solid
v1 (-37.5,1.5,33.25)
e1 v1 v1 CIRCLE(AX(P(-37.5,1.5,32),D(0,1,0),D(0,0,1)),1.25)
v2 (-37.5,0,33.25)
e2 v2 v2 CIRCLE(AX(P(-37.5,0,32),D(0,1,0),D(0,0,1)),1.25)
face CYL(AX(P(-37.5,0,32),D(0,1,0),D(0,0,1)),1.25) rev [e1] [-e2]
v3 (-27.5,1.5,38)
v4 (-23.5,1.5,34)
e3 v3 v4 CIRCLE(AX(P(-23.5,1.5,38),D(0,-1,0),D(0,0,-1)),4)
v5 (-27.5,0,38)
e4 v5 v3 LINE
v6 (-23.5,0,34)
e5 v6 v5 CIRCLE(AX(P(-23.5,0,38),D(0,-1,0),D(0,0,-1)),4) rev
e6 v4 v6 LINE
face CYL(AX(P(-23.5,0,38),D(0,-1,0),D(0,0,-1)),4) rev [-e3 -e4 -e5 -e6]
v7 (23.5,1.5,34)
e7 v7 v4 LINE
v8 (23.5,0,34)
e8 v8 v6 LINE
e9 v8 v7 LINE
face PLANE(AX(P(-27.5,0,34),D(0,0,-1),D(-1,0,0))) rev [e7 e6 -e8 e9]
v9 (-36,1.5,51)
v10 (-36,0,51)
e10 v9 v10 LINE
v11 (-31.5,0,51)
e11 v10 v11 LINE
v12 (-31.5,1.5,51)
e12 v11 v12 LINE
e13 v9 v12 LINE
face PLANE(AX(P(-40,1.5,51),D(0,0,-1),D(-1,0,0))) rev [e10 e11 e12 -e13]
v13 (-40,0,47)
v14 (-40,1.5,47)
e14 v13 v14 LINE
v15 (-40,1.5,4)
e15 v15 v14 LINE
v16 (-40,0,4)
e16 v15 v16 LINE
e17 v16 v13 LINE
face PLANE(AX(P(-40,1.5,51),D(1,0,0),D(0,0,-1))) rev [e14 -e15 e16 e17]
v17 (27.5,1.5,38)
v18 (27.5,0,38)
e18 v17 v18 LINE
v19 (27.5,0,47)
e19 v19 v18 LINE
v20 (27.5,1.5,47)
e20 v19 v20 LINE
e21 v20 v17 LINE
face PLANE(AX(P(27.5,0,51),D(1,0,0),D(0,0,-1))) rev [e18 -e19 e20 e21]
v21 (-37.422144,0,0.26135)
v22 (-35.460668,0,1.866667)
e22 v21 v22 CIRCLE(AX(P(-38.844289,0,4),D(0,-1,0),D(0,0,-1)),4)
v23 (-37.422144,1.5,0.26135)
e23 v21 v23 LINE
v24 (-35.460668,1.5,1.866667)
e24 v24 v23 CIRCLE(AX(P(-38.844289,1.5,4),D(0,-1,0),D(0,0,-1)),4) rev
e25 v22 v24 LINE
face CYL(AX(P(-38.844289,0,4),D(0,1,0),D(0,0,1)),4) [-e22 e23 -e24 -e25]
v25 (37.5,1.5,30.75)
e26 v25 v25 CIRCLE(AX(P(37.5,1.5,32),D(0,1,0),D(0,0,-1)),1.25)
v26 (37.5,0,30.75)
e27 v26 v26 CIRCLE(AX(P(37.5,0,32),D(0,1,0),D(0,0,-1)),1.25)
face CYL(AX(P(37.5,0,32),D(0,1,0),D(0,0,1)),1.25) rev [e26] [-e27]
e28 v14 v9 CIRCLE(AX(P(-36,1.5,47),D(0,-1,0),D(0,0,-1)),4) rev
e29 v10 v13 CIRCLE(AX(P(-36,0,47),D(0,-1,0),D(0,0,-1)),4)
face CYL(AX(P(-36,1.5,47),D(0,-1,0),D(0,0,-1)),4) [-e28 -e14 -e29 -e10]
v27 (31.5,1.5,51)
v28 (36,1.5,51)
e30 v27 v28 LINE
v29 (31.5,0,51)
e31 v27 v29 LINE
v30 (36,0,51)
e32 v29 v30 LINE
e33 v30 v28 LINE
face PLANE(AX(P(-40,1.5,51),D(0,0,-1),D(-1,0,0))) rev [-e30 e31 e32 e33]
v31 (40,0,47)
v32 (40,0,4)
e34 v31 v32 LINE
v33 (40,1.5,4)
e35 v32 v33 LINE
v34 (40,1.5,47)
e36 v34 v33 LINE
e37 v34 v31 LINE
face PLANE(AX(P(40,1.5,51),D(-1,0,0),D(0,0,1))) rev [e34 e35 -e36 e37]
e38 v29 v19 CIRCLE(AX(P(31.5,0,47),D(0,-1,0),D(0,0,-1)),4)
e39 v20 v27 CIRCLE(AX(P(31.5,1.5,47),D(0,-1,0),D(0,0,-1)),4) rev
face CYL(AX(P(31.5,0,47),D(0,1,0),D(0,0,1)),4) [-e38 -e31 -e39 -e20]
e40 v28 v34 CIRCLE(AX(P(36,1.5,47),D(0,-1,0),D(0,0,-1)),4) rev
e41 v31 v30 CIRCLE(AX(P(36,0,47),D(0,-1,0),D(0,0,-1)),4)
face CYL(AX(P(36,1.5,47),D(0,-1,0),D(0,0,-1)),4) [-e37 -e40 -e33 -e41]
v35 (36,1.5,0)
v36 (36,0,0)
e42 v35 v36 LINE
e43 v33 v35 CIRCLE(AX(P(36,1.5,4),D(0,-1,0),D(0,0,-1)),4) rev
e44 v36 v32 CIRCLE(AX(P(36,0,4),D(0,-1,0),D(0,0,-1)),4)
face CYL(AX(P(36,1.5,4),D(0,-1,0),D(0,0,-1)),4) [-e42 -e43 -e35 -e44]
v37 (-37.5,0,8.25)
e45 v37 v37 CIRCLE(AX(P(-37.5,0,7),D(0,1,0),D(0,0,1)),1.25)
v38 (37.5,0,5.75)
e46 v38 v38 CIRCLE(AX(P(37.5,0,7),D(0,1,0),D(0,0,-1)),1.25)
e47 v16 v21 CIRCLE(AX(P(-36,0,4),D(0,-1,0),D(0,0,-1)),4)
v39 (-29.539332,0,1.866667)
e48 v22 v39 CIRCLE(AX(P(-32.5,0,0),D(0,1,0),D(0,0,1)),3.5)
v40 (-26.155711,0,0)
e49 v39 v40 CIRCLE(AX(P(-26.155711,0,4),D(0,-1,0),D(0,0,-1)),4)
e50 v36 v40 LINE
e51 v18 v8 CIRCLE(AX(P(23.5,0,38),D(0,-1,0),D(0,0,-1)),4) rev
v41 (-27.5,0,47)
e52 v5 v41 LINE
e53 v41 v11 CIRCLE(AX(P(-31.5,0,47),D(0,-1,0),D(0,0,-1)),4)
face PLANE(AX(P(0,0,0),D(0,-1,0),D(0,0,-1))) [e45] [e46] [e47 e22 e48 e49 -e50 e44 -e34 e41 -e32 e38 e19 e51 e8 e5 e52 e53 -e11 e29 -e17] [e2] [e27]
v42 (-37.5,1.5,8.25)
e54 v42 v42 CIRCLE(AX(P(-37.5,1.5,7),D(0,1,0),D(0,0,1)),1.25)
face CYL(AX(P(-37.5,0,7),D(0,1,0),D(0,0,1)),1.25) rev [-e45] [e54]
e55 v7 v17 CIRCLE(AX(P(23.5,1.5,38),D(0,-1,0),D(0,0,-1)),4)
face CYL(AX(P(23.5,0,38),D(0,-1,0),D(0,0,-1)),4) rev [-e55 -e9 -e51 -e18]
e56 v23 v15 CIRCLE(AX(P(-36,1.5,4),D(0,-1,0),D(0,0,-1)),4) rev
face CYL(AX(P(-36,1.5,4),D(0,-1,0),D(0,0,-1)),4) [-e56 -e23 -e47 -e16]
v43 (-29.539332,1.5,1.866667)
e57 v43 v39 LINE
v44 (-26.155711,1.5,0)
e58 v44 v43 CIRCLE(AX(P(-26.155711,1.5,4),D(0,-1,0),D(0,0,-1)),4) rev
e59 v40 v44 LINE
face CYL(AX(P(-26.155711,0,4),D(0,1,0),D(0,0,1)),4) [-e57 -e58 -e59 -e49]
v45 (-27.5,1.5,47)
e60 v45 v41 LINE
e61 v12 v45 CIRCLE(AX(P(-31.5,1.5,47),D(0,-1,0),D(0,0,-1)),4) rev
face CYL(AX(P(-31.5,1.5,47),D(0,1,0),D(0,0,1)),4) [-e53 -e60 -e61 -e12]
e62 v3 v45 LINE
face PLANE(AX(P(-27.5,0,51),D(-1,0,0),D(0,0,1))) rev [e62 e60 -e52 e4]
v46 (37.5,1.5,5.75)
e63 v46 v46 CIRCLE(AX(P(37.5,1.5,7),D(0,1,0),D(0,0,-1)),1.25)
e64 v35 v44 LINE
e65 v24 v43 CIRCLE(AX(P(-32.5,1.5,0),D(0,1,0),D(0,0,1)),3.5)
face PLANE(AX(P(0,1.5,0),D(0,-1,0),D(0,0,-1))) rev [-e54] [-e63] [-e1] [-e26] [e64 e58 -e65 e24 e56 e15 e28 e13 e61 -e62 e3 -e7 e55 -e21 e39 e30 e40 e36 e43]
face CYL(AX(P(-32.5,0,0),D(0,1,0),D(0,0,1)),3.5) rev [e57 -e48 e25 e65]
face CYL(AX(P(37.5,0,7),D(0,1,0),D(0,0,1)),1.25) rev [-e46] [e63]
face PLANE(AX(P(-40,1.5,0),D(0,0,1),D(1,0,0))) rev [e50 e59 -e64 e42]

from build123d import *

# Parameters (mm, degrees)
ESQUISSE1_W             = 80
ESQUISSE1_H             = 51.00000000000001
BOSS_EXTRU_1_DEPTH      = 1.5
ESQUISSE2_R             = 1.2500000000000047
ESQUISSE2_R_2           = 1.250000000000005
ESQUISSE2_W             = 55.00000000000001
ESQUISSE2_H             = 17
ENL_V_MAT_EXTRU_1_DEPTH = 65.83247642964135
CONG_1_R                = 4


with BuildPart() as part:
    # Esquisse1 → Boss.-Extru.1 (new body)
    with BuildSketch(Plane(origin=(0, 0, 0), x_dir=(1, 0, 0), z_dir=(0, 1, 0))):
        with Locations((0, -25.500000000000004)):
            Rectangle(ESQUISSE1_W, ESQUISSE1_H)
    extrude(amount=BOSS_EXTRU_1_DEPTH)

    # Esquisse2 → Enlèv. mat.-Extru.1 (cut, through all)
    with BuildSketch(Plane(origin=(0, 1.5, 0), x_dir=(1, 0, 0), z_dir=(0, 1, 0))):
        with Locations(Location((-37.5, -32.00000000000001, 0), (0, 0, 270))):
            Circle(ESQUISSE2_R)
        with Locations(Location((-37.5, -7.000000000000006, 0), (0, 0, 270))):
            Circle(ESQUISSE2_R_2)
        with Locations(Location((37.5, -7.000000000000006, 0), (0, 0, 90))):
            Circle(ESQUISSE2_R_2)
        with Locations(Location((37.5, -32.00000000000001, 0), (0, 0, 90))):
            Circle(ESQUISSE2_R)
        with Locations((0, -42.49999999999999)):
            Rectangle(ESQUISSE2_W, ESQUISSE2_H)
        with BuildLine():
            Line((-36.00000000000001, -1.029e-14), (-29.000000000000004, -9.31e-15))
            ThreePointArc((-29.000000000000004, -9.31e-15), (-32.5, -3.5000000000000115), (-36.00000000000001, -1.029e-14))
        make_face()
    extrude(amount=-ENL_V_MAT_EXTRU_1_DEPTH, mode=Mode.SUBTRACT)

    # Congé1
    # the kernel refuses this fillet: 4 mm, written as the material it adds along each edge
    with BuildSketch(Plane(origin=(-27.5, 1.5, 33.99999999999999), x_dir=(0, 0, 1), z_dir=(0, -1, 0))) as cong_1_piece_1:
        with BuildLine():
            CenterArc((CONG_1_R, -CONG_1_R), CONG_1_R, 90, 90)
            Line((0, -CONG_1_R), (0, 0))
            Line((0, 0), (CONG_1_R, 0))
        make_face()
    extrude(amount=1.5)
    with BuildSketch(Plane(origin=(27.5, 1.5, 33.99999999999999), x_dir=(0, 0, 1), z_dir=(0, -1, 0))) as cong_1_piece_2:
        with BuildLine():
            CenterArc((CONG_1_R, CONG_1_R), CONG_1_R, 180, 90)
            Line((0, CONG_1_R), (0, 0))
            Line((0, 0), (CONG_1_R, 0))
        make_face()
    extrude(amount=1.5)
    # the kernel refuses this fillet: 4 mm, written as the material it takes off along each edge
    with BuildSketch(Plane(origin=(-27.5, 11.5, 51), x_dir=(-1, 0, 0), z_dir=(0, -1, 0)), Plane(origin=(40, -10, 51), x_dir=(0, 0, -1), z_dir=(0, 1, 0)), Plane(origin=(-40, -10, 51), x_dir=(1, 0, 0), z_dir=(0, 1, 0))) as cong_1_2_piece_1:
        with BuildLine():
            CenterArc((CONG_1_R, CONG_1_R), CONG_1_R, 180, 90)
            Line((0, CONG_1_R), (0, 0))
            Line((0, 0), (CONG_1_R, 0))
        make_face()
    extrude(amount=21.5, mode=Mode.SUBTRACT)
    with BuildSketch(Plane(origin=(27.5, 11.5, 51), x_dir=(1, 0, 0), z_dir=(0, -1, 0))) as cong_1_2_piece_2:
        with BuildLine():
            CenterArc((CONG_1_R, -CONG_1_R), CONG_1_R, 90, 90)
            Line((0, -CONG_1_R), (0, 0))
            Line((0, 0), (CONG_1_R, 0))
        make_face()
    extrude(amount=21.5, mode=Mode.SUBTRACT)
    with BuildSketch(Plane(origin=(-29, 8.610721925562018, 0), x_dir=(-0.27757416183489847, 0, 0.9607042128988784), z_dir=(0, -1, 0))) as cong_1_2_piece_3:
        with BuildLine():
            CenterArc((3.0533157801839375, -3.842816851595507), CONG_1_R, 106.11547631775109, 57.76904736449852)
            Line((-0.7895010714115829, -2.732520204255937), (0, 0))
            ThreePointArc((0, 0), (0.9715095664221598, -0.13753525485392898), (1.9430191328443203, 7e-17))
        make_face()
    extrude(amount=15.721443851124036, mode=Mode.SUBTRACT)
    with BuildSketch(Plane(origin=(-36, 8.610721925562018, 0), x_dir=(-1, 0, 0), z_dir=(0, -1, 0))) as cong_1_2_piece_4:
        with BuildLine():
            CenterArc((2.844288770224807, -4), CONG_1_R, 90, 57.769047364498164)
            ThreePointArc((-0.5393319072284086, -1.8666666666666827), (-0.1375352548539297, -0.9715095664221669), (0, 0))
            Line((0, 0), (2.844288770224807, 0))
        make_face()
    extrude(amount=15.721443851124036, mode=Mode.SUBTRACT)
    with BuildSketch(Plane(origin=(-40, -10, 0), x_dir=(0, 0, 1), z_dir=(0, 1, 0))) as cong_1_2_piece_5:
        with BuildLine():
            CenterArc((CONG_1_R, CONG_1_R), CONG_1_R, 180, 90)
            Line((-4.4e-16, CONG_1_R), (0, 0))
            Line((0, 0), (CONG_1_R, 0))
        make_face()
    extrude(amount=21.5, mode=Mode.SUBTRACT)
    with BuildSketch(Plane(origin=(40, -10, 0), x_dir=(-1, 0, 0), z_dir=(0, 1, 0))) as cong_1_2_piece_6:
        with BuildLine():
            CenterArc((CONG_1_R, CONG_1_R), CONG_1_R, 180, 90)
            Line((0, CONG_1_R), (0, 0))
            Line((0, 0), (CONG_1_R, 0))
        make_face()
    extrude(amount=21.5, mode=Mode.SUBTRACT)


solid = part.part
